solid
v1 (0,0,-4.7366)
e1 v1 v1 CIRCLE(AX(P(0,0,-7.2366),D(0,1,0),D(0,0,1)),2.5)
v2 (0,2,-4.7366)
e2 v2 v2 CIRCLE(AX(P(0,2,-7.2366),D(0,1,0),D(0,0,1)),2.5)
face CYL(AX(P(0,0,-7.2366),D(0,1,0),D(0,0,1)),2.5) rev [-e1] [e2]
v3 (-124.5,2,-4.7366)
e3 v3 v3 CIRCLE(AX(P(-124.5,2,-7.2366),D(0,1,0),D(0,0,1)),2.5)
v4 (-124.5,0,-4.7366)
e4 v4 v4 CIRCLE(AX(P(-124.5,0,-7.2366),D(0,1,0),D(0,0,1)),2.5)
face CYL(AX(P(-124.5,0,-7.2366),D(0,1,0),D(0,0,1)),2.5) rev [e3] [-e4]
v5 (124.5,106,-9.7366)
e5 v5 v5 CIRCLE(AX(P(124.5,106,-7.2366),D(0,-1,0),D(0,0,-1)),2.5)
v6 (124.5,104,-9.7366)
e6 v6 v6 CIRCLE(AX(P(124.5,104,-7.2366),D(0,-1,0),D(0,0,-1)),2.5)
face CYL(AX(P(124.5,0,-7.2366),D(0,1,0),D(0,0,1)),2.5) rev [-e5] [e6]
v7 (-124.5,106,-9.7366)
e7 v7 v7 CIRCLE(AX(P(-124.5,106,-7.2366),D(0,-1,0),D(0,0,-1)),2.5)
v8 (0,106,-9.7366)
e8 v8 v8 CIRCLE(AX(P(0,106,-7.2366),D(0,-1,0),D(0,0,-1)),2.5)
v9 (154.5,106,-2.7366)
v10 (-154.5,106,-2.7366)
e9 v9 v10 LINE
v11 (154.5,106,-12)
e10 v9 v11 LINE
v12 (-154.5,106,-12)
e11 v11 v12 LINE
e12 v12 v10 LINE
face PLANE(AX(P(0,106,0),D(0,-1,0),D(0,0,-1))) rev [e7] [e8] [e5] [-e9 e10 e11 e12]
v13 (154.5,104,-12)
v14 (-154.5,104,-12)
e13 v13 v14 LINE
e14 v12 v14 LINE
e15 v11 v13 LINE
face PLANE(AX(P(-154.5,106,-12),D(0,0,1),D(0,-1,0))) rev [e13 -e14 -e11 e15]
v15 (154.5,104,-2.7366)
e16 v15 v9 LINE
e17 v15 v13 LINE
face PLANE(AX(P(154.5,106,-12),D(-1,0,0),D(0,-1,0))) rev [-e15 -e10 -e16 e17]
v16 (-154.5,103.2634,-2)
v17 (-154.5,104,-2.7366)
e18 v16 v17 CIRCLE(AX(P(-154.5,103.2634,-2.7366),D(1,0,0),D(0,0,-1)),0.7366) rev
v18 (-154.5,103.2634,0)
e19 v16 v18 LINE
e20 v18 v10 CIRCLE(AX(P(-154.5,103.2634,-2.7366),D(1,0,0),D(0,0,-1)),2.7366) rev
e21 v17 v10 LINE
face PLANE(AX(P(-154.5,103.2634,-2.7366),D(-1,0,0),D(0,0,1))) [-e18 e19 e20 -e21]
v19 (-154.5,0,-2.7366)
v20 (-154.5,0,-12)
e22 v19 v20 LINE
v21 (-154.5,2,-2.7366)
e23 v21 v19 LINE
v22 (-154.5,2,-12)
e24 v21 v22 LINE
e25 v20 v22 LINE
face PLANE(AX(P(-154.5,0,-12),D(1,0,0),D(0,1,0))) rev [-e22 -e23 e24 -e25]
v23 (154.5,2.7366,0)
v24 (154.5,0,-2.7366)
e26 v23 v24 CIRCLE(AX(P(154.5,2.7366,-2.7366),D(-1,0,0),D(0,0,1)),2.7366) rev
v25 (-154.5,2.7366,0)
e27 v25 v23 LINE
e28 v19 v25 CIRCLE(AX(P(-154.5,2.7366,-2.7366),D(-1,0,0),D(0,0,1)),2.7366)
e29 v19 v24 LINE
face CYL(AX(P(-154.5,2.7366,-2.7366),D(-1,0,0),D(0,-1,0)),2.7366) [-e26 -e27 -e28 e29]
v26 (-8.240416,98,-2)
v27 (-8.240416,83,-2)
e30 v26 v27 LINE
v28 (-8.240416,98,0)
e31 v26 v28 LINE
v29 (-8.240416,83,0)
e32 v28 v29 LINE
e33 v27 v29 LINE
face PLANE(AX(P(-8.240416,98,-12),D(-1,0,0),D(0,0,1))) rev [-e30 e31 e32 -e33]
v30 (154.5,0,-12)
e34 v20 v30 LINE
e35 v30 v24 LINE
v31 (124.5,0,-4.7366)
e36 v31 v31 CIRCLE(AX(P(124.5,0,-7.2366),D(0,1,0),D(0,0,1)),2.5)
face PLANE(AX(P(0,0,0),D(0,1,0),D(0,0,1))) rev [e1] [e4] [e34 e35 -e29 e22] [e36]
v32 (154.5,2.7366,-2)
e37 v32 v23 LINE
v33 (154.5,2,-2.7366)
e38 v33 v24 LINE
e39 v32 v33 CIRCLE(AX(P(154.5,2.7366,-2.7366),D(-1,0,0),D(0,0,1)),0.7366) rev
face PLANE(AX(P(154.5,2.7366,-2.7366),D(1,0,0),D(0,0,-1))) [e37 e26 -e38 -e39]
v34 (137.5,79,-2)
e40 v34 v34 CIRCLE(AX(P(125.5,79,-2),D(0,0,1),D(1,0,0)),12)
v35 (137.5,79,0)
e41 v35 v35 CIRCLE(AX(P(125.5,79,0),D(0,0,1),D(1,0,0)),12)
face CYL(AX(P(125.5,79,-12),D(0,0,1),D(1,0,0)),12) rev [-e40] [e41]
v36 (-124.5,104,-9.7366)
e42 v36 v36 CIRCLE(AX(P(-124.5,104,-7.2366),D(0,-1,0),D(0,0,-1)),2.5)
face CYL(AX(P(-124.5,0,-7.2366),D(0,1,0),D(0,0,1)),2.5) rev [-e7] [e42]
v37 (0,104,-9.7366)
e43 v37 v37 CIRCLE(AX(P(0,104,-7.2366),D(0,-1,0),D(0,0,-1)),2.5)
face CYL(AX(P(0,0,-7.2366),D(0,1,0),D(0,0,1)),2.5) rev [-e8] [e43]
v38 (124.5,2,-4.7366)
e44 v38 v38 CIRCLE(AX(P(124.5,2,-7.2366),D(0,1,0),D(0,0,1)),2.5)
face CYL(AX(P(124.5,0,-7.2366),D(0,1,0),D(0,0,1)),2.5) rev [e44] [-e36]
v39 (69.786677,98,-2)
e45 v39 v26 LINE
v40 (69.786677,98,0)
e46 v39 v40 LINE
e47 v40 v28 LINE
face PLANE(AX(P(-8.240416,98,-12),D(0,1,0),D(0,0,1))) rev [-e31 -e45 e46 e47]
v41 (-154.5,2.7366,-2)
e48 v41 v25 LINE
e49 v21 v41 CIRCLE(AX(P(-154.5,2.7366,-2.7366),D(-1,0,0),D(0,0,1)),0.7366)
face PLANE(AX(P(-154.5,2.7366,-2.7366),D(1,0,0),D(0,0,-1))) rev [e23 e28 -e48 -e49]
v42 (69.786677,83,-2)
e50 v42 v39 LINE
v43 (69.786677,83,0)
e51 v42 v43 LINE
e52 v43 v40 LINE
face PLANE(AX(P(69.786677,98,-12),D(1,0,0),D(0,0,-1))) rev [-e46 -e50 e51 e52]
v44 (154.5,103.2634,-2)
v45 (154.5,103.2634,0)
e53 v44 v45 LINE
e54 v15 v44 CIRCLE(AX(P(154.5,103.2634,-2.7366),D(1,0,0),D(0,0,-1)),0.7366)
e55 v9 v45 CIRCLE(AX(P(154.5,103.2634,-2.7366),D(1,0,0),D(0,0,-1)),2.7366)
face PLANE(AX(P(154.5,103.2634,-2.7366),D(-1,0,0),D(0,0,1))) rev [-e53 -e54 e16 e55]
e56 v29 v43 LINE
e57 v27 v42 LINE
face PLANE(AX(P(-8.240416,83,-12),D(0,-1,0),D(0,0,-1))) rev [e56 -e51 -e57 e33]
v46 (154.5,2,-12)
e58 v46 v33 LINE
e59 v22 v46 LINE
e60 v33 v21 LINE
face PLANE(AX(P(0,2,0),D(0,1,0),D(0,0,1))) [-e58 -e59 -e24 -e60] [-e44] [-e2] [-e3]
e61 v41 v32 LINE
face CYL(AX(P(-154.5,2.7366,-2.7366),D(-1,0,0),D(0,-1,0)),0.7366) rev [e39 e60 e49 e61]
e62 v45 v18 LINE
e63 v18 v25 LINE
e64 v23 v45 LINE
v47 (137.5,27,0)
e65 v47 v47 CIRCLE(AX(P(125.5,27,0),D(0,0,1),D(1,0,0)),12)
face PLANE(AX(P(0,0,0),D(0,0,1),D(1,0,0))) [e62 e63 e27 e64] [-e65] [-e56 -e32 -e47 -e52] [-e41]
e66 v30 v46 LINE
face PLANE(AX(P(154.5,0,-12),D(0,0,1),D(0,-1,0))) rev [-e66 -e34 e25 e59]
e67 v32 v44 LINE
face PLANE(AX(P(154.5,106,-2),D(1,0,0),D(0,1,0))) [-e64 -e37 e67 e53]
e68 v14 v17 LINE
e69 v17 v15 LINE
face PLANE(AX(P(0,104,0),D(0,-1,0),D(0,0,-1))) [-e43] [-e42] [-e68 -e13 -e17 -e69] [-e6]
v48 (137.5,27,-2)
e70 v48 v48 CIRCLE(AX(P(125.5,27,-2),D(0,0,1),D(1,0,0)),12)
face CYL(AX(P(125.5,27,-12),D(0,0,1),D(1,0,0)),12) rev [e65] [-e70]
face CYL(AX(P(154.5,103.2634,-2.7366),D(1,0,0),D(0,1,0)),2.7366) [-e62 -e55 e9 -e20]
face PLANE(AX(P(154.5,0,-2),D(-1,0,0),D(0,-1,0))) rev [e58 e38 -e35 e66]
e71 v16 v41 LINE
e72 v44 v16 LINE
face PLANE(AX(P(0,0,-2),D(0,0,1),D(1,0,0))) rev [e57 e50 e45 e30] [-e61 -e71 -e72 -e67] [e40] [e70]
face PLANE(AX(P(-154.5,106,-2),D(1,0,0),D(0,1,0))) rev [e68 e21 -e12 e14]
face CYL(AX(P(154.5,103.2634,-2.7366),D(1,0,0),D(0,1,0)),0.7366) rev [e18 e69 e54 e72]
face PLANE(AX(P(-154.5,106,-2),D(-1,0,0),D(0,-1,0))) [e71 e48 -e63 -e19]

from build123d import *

# Parameters (mm, degrees)
SKETCH2_W                      = 309
SKETCH2_H                      = 106
BASE_FLANGE1_DEPTH             = 2
EDGE_FLANGE1_STRIP_W           = 9.4732
EDGE_FLANGE1_STRIP_H           = 2
EDGE_FLANGE1_STRIP_CUT_DEPTH   = 309
EDGE_FLANGE1_STRIP_2_W         = 9.4732
EDGE_FLANGE1_STRIP_2_H         = 2
EDGE_FLANGE1_STRIP_CUT_2_DEPTH = 309
EDGE_FLANGE1_DEPTH             = 309
EDGE_FLANGE1_BEND_DEPTH        = 309
CUT_EXTRUDE1_DEPTH             = 188.750499334
CUT_EXTRUDE1_DEPTH_BACK        = 188.750499334
SKETCH13_R                     = 12
CUT_EXTRUDE2_DEPTH             = 188.750499334
CUT_EXTRUDE2_DEPTH_BACK        = 188.750499334
SKETCH14_W                     = 78.027092835
SKETCH14_H                     = 15
CUT_EXTRUDE3_DEPTH             = 188.750499334
CUT_EXTRUDE3_DEPTH_BACK        = 188.750499334
SKETCH15_R                     = 2.5


# Sheet-metal steps are written as plain solids
with BuildPart() as part:
    # Sketch2 → Base-Flange1 (new body)
    with BuildSketch(Plane.XY):
        with Locations((0, 53)):
            Rectangle(SKETCH2_W, SKETCH2_H)
    extrude(amount=-BASE_FLANGE1_DEPTH)

    # Edge-Flange1 strip (across the edge) → Edge-Flange1 strip cut (cut)
    with BuildSketch(Plane(origin=(154.5, 0, -2), x_dir=(0, 1, 0), z_dir=(-1, 0, 0))):
        with Locations((-2, -1)):
            Rectangle(EDGE_FLANGE1_STRIP_W, EDGE_FLANGE1_STRIP_H)
    extrude(amount=EDGE_FLANGE1_STRIP_CUT_DEPTH, mode=Mode.SUBTRACT)

    # Edge-Flange1 strip 2 (across the edge) → Edge-Flange1 strip cut 2 (cut)
    with BuildSketch(Plane(origin=(-154.5, 106, -2), x_dir=(0, -1, 0), z_dir=(1, 0, 0))):
        with Locations((-2, -1)):
            Rectangle(EDGE_FLANGE1_STRIP_2_W, EDGE_FLANGE1_STRIP_2_H)
    extrude(amount=EDGE_FLANGE1_STRIP_CUT_2_DEPTH, mode=Mode.SUBTRACT)

    # Edge-Flange1 section (across the edge) → Edge-Flange1 (add)
    with BuildSketch(Plane(origin=(154.5, 0, -2), x_dir=(0, 1, 0), z_dir=(-1, 0, 0))):
        with BuildLine():
            Line((0, 0.7366), (0, 10))
            Line((0, 10), (2, 10))
            Line((2, 10), (2, 0.7366))
            ThreePointArc((2, 0.7366), (2.215745145, 0.215745145), (2.7366, 0))
            Line((2.7366, 0), (2.7366, -2))
            ThreePointArc((2.7366, -2), (0.801531583, -1.198468417), (0, 0.7366))
        make_face()
    extrude(amount=EDGE_FLANGE1_DEPTH)

    # Edge-Flange1 section 2 (across the edge) → Edge-Flange1 bend (add)
    with BuildSketch(Plane(origin=(-154.5, 106, -2), x_dir=(0, -1, 0), z_dir=(1, 0, 0))):
        with BuildLine():
            Line((0, 0.7366), (0, 10))
            Line((0, 10), (2, 10))
            Line((2, 10), (2, 0.7366))
            ThreePointArc((2, 0.7366), (2.215745145, 0.215745145), (2.7366, 0))
            Line((2.7366, 0), (2.7366, -2))
            ThreePointArc((2.7366, -2), (0.801531583, -1.198468417), (0, 0.7366))
        make_face()
    extrude(amount=EDGE_FLANGE1_BEND_DEPTH)

    # Sketch13 → Cut-Extrude1 (cut, two sides: drawn at the far end of the back side and taken through both)
    with BuildSketch(Plane.XY.offset(-CUT_EXTRUDE1_DEPTH_BACK)):
        with Locations((125.5, 79)):
            Circle(SKETCH13_R)
        with Locations((125.5, 27)):
            Circle(SKETCH13_R)
    extrude(amount=CUT_EXTRUDE1_DEPTH + CUT_EXTRUDE1_DEPTH_BACK, mode=Mode.SUBTRACT)

    # Sketch14 → Cut-Extrude2 (cut, two sides: drawn at the far end of the back side and taken through both)
    with BuildSketch(Plane.XY.offset(-CUT_EXTRUDE2_DEPTH_BACK)):
        with Locations((30.773130234, 90.5)):
            Rectangle(SKETCH14_W, SKETCH14_H)
    extrude(amount=CUT_EXTRUDE2_DEPTH + CUT_EXTRUDE2_DEPTH_BACK, mode=Mode.SUBTRACT)

    # Sketch15 → Cut-Extrude3 (cut, two sides: drawn at the far end of the back side and taken through both)
    with BuildSketch(Plane(origin=(0, 106, 0), x_dir=(1, 0, 0), z_dir=(0, 1, 0)).offset(-CUT_EXTRUDE3_DEPTH_BACK)):
        with Locations(Location((124.5, 7.2366, 0), (0, 0, 90))):
            Circle(SKETCH15_R)
        with Locations(Location((0, 7.2366, 0), (0, 0, 90))):
            Circle(SKETCH15_R)
        with Locations(Location((-124.5, 7.2366, 0), (0, 0, 90))):
            Circle(SKETCH15_R)
    extrude(amount=CUT_EXTRUDE3_DEPTH + CUT_EXTRUDE3_DEPTH_BACK, mode=Mode.SUBTRACT)


solid = part.part
